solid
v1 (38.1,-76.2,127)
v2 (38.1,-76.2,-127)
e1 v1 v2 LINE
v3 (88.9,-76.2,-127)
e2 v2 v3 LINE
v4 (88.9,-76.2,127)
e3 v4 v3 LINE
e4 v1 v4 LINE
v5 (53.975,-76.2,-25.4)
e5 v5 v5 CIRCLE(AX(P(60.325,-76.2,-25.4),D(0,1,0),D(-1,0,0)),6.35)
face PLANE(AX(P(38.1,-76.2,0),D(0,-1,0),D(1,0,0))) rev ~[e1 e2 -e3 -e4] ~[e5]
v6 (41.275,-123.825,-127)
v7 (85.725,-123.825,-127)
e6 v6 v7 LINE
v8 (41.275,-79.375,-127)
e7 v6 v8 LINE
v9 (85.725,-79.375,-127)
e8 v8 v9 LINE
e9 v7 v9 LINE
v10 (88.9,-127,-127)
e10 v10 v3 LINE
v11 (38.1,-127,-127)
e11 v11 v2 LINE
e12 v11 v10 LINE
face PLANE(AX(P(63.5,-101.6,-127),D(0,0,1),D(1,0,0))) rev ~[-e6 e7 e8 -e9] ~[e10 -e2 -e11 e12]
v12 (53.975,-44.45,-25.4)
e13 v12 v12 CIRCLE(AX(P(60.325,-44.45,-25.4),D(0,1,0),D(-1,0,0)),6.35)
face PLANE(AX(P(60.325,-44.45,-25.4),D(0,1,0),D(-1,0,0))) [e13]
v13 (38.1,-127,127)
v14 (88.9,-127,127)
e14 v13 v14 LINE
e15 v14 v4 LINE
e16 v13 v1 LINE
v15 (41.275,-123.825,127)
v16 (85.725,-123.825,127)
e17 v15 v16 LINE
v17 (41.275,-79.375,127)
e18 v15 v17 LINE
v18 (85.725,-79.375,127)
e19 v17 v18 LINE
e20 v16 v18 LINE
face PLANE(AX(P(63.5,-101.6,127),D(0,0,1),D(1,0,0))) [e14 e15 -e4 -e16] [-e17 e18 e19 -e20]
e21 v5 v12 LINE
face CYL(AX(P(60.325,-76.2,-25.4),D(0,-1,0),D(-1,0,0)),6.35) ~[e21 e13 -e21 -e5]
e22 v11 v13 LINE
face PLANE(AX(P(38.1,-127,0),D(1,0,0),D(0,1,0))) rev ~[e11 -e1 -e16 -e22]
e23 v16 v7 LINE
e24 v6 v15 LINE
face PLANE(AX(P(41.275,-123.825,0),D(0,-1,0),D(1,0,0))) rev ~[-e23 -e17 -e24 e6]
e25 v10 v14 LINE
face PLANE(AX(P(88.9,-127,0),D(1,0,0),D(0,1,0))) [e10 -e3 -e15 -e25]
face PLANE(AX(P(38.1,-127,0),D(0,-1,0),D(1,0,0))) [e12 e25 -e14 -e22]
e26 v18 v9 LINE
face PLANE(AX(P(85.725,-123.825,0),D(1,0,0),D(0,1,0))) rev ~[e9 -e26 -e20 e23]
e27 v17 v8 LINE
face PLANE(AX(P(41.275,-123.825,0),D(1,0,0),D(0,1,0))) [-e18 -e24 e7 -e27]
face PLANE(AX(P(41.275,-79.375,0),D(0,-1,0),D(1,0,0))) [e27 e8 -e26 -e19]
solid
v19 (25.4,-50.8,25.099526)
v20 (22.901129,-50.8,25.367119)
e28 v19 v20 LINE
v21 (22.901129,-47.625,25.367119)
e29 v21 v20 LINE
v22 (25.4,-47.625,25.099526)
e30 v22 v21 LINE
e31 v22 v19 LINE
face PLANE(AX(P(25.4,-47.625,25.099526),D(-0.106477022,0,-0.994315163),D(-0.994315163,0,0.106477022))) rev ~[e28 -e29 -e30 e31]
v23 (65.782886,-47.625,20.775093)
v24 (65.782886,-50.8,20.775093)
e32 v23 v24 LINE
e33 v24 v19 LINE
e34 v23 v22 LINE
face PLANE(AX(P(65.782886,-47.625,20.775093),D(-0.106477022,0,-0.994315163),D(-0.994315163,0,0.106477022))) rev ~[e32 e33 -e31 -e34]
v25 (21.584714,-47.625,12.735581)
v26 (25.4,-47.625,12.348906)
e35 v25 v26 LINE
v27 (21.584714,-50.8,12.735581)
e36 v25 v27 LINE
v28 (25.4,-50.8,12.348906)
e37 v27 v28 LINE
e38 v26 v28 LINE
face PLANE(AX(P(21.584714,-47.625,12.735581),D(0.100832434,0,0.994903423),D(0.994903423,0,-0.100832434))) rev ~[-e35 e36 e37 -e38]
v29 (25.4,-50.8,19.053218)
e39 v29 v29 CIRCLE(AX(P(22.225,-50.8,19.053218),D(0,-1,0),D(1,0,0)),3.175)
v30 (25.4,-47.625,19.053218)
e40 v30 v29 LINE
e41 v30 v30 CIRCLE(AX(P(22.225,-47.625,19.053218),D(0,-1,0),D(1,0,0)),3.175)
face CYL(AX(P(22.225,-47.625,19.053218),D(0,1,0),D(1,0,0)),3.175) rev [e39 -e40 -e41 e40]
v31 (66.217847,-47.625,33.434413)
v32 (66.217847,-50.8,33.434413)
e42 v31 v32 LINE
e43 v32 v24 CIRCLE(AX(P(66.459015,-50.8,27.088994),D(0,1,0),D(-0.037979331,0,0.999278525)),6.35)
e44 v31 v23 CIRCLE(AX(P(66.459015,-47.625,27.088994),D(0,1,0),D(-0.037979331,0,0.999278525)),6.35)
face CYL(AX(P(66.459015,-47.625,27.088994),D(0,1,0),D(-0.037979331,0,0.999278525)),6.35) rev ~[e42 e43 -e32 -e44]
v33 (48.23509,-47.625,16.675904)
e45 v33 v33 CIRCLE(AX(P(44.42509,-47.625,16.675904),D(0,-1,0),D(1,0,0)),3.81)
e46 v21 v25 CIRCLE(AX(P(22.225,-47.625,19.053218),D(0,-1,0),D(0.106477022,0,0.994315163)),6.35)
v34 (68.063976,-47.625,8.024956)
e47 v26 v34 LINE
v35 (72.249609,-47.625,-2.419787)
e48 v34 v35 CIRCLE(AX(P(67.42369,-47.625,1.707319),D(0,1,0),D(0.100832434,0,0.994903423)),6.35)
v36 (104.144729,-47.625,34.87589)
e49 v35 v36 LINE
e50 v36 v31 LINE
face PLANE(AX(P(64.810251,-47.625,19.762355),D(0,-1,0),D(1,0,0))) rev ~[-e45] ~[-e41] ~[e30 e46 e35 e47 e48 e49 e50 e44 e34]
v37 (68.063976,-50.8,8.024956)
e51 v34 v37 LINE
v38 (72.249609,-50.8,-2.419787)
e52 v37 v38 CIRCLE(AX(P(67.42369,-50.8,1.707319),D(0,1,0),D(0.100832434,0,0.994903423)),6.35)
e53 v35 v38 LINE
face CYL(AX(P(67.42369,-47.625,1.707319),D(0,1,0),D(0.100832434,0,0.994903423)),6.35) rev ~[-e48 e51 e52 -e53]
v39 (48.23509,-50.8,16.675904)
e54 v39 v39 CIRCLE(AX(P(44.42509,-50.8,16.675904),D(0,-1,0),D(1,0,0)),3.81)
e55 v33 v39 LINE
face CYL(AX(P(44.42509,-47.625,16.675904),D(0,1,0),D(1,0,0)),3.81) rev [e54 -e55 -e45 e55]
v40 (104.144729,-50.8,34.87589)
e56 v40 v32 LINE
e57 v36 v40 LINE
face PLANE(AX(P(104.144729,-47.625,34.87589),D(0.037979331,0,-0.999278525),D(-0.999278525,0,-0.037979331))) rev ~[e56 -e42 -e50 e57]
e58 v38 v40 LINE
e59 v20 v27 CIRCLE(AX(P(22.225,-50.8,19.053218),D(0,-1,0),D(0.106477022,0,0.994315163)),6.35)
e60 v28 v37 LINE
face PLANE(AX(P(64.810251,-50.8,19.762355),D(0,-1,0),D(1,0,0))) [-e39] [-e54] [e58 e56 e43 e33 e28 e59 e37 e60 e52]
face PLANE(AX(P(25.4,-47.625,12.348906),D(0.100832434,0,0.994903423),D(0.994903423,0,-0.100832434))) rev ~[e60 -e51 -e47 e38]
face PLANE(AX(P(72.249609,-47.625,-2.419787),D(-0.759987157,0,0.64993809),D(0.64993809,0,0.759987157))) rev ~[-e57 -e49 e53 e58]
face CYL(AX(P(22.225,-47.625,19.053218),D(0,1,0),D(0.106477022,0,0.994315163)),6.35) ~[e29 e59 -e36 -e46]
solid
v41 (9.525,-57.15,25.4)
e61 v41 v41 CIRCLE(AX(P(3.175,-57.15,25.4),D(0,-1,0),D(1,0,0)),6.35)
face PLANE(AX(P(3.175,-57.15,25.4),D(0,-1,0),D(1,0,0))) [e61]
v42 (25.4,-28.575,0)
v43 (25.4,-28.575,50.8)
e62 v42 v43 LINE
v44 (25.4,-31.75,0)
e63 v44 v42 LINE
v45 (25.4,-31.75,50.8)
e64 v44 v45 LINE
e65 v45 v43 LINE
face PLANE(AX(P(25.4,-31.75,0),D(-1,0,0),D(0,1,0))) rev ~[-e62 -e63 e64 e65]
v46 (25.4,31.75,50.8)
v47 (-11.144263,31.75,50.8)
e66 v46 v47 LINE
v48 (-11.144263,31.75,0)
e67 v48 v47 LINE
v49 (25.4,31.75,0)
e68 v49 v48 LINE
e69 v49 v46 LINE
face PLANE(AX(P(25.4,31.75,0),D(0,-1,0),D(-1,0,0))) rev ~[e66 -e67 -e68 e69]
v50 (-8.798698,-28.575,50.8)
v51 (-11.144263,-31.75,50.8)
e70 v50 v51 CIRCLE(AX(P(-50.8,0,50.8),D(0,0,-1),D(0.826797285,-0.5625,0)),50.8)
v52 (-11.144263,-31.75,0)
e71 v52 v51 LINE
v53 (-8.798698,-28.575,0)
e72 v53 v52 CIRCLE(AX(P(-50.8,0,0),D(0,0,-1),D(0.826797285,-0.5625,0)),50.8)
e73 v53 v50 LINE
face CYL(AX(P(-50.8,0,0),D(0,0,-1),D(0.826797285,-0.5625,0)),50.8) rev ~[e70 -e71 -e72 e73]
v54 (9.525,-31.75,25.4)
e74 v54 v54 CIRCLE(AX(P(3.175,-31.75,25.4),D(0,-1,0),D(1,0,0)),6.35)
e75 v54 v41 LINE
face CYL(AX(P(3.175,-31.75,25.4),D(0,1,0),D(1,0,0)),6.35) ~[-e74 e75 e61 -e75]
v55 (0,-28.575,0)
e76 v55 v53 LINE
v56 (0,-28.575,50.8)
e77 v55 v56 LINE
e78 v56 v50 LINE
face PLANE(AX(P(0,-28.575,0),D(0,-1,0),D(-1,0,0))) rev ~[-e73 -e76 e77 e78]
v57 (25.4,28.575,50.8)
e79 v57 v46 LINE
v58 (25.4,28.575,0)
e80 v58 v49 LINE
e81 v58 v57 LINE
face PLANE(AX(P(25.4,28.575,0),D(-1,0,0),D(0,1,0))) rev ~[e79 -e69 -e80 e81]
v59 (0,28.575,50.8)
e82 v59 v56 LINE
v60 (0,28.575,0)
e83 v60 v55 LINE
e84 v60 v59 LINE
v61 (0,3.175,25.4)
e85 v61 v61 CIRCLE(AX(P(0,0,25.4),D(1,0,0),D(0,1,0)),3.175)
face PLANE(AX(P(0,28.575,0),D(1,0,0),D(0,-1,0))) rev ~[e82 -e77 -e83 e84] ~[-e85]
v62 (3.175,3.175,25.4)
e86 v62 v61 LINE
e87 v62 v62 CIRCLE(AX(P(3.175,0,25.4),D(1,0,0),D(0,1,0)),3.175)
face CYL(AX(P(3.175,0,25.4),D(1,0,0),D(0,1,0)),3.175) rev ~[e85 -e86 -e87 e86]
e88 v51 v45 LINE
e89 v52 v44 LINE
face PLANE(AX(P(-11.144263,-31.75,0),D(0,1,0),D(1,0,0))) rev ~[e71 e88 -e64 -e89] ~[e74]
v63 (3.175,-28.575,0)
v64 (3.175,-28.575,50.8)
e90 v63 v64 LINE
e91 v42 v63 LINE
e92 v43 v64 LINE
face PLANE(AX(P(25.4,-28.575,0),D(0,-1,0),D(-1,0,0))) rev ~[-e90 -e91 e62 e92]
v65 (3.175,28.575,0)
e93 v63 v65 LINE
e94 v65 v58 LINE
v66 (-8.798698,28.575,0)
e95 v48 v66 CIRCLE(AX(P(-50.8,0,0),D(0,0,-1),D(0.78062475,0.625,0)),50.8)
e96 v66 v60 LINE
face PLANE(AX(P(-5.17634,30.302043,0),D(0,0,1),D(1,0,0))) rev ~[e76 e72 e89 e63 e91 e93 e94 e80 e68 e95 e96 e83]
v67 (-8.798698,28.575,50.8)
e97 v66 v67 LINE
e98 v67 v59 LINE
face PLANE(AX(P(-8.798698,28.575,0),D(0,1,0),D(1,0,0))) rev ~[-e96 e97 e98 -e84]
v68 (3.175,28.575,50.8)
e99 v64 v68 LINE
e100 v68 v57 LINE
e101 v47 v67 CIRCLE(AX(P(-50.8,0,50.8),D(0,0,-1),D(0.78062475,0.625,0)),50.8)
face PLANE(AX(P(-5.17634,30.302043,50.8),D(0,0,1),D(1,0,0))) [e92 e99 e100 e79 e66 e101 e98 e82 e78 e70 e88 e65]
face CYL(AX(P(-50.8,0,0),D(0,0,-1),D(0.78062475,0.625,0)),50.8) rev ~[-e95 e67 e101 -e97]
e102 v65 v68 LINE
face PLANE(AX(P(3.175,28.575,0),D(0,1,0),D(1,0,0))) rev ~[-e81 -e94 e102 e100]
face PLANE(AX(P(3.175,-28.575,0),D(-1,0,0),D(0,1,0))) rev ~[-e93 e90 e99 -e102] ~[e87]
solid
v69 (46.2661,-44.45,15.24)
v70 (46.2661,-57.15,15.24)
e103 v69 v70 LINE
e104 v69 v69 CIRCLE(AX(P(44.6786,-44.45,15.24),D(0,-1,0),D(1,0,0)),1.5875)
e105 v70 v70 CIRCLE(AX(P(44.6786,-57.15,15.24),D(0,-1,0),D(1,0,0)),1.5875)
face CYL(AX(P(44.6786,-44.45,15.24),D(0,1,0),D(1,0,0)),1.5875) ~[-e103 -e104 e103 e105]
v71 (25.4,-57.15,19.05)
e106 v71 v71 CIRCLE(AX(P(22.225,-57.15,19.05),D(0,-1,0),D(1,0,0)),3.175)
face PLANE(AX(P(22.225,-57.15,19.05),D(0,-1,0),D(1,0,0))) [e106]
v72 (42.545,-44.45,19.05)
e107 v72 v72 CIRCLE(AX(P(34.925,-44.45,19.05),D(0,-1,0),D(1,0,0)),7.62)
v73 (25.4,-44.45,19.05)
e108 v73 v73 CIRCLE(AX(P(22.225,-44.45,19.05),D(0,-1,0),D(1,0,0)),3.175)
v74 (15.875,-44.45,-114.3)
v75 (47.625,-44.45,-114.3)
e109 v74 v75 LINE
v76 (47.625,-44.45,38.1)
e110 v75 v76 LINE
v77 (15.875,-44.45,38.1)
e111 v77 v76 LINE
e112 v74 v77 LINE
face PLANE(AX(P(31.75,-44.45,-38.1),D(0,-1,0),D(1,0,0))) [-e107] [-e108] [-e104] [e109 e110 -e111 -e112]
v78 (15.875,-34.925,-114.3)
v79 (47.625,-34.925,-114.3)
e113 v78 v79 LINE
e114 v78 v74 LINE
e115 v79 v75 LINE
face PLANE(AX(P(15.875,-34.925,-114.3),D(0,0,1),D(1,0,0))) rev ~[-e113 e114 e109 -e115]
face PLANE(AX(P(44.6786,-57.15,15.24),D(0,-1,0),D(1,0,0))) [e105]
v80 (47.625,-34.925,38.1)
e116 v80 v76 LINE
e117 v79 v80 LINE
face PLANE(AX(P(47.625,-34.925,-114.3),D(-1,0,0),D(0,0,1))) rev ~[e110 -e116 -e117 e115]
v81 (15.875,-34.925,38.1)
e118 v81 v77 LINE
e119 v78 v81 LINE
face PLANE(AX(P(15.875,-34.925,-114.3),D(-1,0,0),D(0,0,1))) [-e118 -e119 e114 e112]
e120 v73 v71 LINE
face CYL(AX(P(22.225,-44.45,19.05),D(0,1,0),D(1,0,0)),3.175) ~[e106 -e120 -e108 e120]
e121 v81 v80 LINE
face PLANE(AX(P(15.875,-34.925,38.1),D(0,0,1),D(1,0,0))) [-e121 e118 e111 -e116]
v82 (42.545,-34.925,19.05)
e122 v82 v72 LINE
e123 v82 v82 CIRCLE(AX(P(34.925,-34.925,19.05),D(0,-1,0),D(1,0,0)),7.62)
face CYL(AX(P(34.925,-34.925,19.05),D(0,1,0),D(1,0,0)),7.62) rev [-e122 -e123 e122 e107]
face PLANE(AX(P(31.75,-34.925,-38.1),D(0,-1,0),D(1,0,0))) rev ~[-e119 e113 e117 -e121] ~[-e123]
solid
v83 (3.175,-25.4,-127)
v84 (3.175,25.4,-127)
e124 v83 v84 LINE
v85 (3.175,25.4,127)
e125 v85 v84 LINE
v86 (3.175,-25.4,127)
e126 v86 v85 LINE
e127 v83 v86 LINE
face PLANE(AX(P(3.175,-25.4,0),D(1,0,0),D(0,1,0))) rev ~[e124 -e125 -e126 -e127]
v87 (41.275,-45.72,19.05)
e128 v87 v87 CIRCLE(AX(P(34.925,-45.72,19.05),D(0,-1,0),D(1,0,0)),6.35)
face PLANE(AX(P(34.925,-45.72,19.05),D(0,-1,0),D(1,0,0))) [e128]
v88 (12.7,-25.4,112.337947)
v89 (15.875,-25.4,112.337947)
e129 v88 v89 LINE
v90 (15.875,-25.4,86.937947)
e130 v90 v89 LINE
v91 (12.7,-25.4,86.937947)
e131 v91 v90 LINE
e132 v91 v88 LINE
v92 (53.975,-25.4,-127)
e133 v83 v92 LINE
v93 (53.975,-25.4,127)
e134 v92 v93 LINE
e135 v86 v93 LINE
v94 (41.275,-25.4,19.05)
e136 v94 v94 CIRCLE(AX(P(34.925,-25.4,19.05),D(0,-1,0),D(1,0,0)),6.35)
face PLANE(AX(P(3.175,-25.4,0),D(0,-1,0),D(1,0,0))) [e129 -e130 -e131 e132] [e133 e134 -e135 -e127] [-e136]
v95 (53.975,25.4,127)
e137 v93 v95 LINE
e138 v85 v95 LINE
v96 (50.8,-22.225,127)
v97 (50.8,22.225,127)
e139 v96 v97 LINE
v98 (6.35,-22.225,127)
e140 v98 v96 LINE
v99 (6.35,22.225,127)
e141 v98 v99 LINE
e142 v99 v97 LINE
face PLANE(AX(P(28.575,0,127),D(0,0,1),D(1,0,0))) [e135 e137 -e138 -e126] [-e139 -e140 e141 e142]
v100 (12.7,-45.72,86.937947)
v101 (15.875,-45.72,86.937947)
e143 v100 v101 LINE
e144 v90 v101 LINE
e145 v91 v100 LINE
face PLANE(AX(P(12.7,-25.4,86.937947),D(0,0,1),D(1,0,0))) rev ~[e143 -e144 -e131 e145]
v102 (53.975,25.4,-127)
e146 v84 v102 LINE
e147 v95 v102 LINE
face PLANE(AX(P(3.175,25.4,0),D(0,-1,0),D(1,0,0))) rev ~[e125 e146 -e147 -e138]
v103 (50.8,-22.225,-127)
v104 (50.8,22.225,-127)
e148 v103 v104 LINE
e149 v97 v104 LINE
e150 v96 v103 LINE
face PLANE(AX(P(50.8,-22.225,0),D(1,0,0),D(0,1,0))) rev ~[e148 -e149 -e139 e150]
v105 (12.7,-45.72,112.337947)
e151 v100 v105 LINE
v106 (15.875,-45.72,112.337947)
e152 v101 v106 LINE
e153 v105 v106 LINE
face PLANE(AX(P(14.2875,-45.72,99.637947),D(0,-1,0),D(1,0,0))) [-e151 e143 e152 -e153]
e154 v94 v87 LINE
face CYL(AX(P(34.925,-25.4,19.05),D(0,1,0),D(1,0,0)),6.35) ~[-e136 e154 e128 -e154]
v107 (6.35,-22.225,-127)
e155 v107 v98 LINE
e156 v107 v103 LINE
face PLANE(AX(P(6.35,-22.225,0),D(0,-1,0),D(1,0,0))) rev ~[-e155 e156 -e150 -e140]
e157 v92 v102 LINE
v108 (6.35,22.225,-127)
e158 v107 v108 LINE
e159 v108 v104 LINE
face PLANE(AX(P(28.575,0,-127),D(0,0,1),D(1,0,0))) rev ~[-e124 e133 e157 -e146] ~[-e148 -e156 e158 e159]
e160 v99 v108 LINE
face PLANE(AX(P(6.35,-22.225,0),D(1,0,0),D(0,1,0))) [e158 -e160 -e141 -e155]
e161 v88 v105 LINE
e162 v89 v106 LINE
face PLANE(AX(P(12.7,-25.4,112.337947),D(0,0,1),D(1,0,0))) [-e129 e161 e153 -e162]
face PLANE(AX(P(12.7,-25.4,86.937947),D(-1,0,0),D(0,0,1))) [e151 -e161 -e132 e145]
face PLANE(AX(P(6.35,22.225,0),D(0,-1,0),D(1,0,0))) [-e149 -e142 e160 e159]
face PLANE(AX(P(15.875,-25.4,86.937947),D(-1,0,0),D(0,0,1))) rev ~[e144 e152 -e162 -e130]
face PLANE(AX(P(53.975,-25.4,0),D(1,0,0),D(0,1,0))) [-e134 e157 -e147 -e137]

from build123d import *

# Parameters (mm, degrees)
F1_DEPTH  = 50.8
F2_R      = 3.175
F3_DEPTH  = 14.3202627102
F4_W      = 50.8
F4_H      = 50.8
F4_W_2    = 44.45
F4_H_2    = 44.45
F5_DEPTH  = 127
F6_R      = 6.35
F7_DEPTH  = 25.4
F8_R      = 6.35
F8_W      = 3.175
F8_H      = 25.4
F9_DEPTH  = 20.32
F11_START = 15.875
F10_R     = 3.81
F10_R_2   = 3.175
F11_DEPTH = 3.175
F12_START = 9.525
F8_W_2    = 31.75
F8_H_2    = 152.4
F8_R_2    = 7.62
F12_DEPTH = 9.525
F13_R     = 3.175
F13_R_2   = 1.5875
F14_DEPTH = 12.7
F15_R     = 6.35
F16_DEPTH = 31.75


# Not quite as in the source:
# - a feature names something its author has since deleted; it is built from what else it names


with BuildPart() as f1:
    # F0 (on Top) → F1 (new body)
    with BuildSketch(Plane.XY):
        with BuildLine():
            Line((0, 28.575), (0, 31.75))
            Line((0, 31.75), (-11.1442627102, 31.75))
            ThreePointArc((-11.1442627102, 31.75), (-9.940629285, 30.1852915304), (-8.7986979368, 28.575))
            Line((-8.7986979368, 28.575), (0, 28.575))
        make_face()
        Polygon((25.4, 28.575), (25.4, 31.75), (0, 31.75), (0, 28.575), (0, -28.575), (0, -31.75), (25.4, -31.75), (25.4, -28.575), (3.175, -28.575), (3.175, 28.575), align=None)
        with BuildLine():
            Line((0, -31.75), (0, -28.575))
            Line((0, -28.575), (-8.7986979368, -28.575))
            ThreePointArc((-8.7986979368, -28.575), (-9.940629285, -30.1852915304), (-11.1442627102, -31.75))
            Line((-11.1442627102, -31.75), (0, -31.75))
        make_face()
    extrude(amount=F1_DEPTH)

    # F2 (on face) → F3 (cut, through all)
    with BuildSketch(Plane.YZ.offset(3.175)):
        with Locations((0, 25.4)):
            Circle(F2_R)
    extrude(amount=-F3_DEPTH, mode=Mode.SUBTRACT)

    # F6 (on face) → F7 (join)
    with BuildSketch(Plane.XZ.offset(31.75)):
        with Locations((3.175, 25.4)):
            Circle(F6_R)
    extrude(amount=F7_DEPTH)


with BuildPart() as f5:
    # F4 (on Top) → F5 (new body, symmetric)
    with BuildSketch(Plane.XY):
        with Locations((28.575, 0)):
            Rectangle(F4_W, F4_H)
        with Locations((28.575, 0)):
            Rectangle(F4_W_2, F4_H_2, mode=Mode.SUBTRACT)
    extrude(amount=F5_DEPTH, both=True)

    # F8 (on face) → F9 (join)
    with BuildSketch(Plane.XZ.offset(25.4)):
        with Locations((34.925, 19.05)):
            Circle(F8_R)
        with Locations((14.2875, 99.6379471987)):
            Rectangle(F8_W, F8_H)
    extrude(amount=F9_DEPTH)


with BuildPart() as f5b:
    # F4 (on Top) → F5, piece 2 (new body, symmetric)
    with BuildSketch(Plane.XY):
        with Locations((63.5, -101.6)):
            Rectangle(F4_W, F4_H)
        with Locations((63.5, -101.6)):
            Rectangle(F4_W_2, F4_H_2, mode=Mode.SUBTRACT)
    extrude(amount=F5_DEPTH, both=True)

    # F15 (on face) → F16 (join)
    with BuildSketch(Plane(origin=(0, -76.2, 0), x_dir=(-1, 0, 0), z_dir=(0, 1, 0))):
        with Locations((-60.325, -25.4)):
            Circle(F15_R)
    extrude(amount=F16_DEPTH)


with BuildPart() as f11:
    # F10 (on face) → F11 (new body)
    with BuildSketch(Plane.XZ.offset(31.75).offset(F11_START)):
        with BuildLine():
            ThreePointArc((28.5750004077, 19.0532180694), (27.724261604, 15.8782178656), (25.4, 13.55395652))
            Line((25.4, 13.55395652), (25.4, 12.3489060883))
            Line((25.4, 12.3489060883), (68.0639762232, 8.0249561852))
            ThreePointArc((68.0639762232, 8.0249561852), (73.3180108307, 4.0694128265), (72.2496087167, -2.4197874203))
            Line((72.2496087167, -2.4197874203), (104.1447286146, 34.8758902287))
            Line((104.1447286146, 34.8758902287), (66.2178465005, 33.4344126184))
            ThreePointArc((66.2178465005, 33.4344126184), (72.8052703736, 26.8709436265), (65.7828861663, 20.7750926985))
            Line((65.7828861663, 20.7750926985), (25.4, 25.0995258416))
            Line((25.4, 25.0995258416), (25.4, 24.5524796189))
            ThreePointArc((25.4, 24.5524796189), (27.724261604, 22.2282182733), (28.5750004077, 19.0532180694))
        make_face()
        with Locations((44.4250904951, 16.6759039528)):
            Circle(F10_R, mode=Mode.SUBTRACT)
        with BuildLine():
            Line((25.4, 13.55395652), (25.4, 19.0532180694))
            Line((25.4, 19.0532180694), (25.4, 24.5524796189))
            ThreePointArc((25.4, 24.5524796189), (24.1931740543, 25.0905016057), (22.9011294955, 25.367119356))
            ThreePointArc((22.9011294955, 25.367119356), (15.9092059707, 19.7114282405), (21.5847144531, 12.7355813359))
            ThreePointArc((21.5847144531, 12.7355813359), (23.556776587, 12.8444442607), (25.4, 13.55395652))
        make_face()
        with Locations((22.2250004077, 19.0532180694)):
            Circle(F10_R_2, mode=Mode.SUBTRACT)
        with BuildLine():
            Line((25.4, 24.5524796189), (25.4, 19.0532180694))
            Line((25.4, 19.0532180694), (25.4, 13.55395652))
            ThreePointArc((25.4, 13.55395652), (27.724261604, 15.8782178656), (28.5750004077, 19.0532180694))
            ThreePointArc((28.5750004077, 19.0532180694), (27.724261604, 22.2282182733), (25.4, 24.5524796189))
        make_face()
        with BuildLine():
            Line((25.4, 13.55395652), (25.4, 19.0532180694))
            Line((25.4, 19.0532180694), (25.4, 24.5524796189))
            ThreePointArc((25.4, 24.5524796189), (24.1931740543, 25.0905016057), (22.9011294955, 25.367119356))
            ThreePointArc((22.9011294955, 25.367119356), (15.9092059707, 19.7114282405), (21.5847144531, 12.7355813359))
            ThreePointArc((21.5847144531, 12.7355813359), (23.556776587, 12.8444442607), (25.4, 13.55395652))
        make_face()
        with Locations((22.2250004077, 19.0532180694)):
            Circle(F10_R_2, mode=Mode.SUBTRACT)
        with BuildLine():
            ThreePointArc((22.9011294955, 25.367119356), (24.1931740543, 25.0905016057), (25.4, 24.5524796189))
            Line((25.4, 24.5524796189), (25.4, 25.0995258416))
            Line((25.4, 25.0995258416), (22.9011294955, 25.367119356))
        make_face()
        with BuildLine():
            Line((25.4, 12.3489060883), (25.4, 13.55395652))
            ThreePointArc((25.4, 13.55395652), (23.556776587, 12.8444442607), (21.5847144531, 12.7355813359))
            Line((21.5847144531, 12.7355813359), (25.4, 12.3489060883))
        make_face()
    extrude(amount=F11_DEPTH)


with BuildPart() as f12:
    # F8 (on face) → F12 (new body)
    with BuildSketch(Plane.XZ.offset(25.4).offset(F12_START)):
        with Locations((31.75, -38.1)):
            Rectangle(F8_W_2, F8_H_2)
        with Locations((34.925, 19.05)):
            Circle(F8_R_2, mode=Mode.SUBTRACT)
        with Locations((31.75, -38.1)):
            Rectangle(F8_W_2, F8_H_2)
        with Locations((34.925, 19.05)):
            Circle(F8_R_2, mode=Mode.SUBTRACT)
    extrude(amount=F12_DEPTH)

    # F13 (on face) → F14 (join)
    with BuildSketch(Plane.XZ.offset(44.45)):
        with Locations((22.225, 19.05)):
            Circle(F13_R)
        with Locations((44.6786, 15.24)):
            Circle(F13_R_2)
    extrude(amount=F14_DEPTH)


solid = Compound([f1.part, f5.part, f5b.part, f11.part, f12.part])
